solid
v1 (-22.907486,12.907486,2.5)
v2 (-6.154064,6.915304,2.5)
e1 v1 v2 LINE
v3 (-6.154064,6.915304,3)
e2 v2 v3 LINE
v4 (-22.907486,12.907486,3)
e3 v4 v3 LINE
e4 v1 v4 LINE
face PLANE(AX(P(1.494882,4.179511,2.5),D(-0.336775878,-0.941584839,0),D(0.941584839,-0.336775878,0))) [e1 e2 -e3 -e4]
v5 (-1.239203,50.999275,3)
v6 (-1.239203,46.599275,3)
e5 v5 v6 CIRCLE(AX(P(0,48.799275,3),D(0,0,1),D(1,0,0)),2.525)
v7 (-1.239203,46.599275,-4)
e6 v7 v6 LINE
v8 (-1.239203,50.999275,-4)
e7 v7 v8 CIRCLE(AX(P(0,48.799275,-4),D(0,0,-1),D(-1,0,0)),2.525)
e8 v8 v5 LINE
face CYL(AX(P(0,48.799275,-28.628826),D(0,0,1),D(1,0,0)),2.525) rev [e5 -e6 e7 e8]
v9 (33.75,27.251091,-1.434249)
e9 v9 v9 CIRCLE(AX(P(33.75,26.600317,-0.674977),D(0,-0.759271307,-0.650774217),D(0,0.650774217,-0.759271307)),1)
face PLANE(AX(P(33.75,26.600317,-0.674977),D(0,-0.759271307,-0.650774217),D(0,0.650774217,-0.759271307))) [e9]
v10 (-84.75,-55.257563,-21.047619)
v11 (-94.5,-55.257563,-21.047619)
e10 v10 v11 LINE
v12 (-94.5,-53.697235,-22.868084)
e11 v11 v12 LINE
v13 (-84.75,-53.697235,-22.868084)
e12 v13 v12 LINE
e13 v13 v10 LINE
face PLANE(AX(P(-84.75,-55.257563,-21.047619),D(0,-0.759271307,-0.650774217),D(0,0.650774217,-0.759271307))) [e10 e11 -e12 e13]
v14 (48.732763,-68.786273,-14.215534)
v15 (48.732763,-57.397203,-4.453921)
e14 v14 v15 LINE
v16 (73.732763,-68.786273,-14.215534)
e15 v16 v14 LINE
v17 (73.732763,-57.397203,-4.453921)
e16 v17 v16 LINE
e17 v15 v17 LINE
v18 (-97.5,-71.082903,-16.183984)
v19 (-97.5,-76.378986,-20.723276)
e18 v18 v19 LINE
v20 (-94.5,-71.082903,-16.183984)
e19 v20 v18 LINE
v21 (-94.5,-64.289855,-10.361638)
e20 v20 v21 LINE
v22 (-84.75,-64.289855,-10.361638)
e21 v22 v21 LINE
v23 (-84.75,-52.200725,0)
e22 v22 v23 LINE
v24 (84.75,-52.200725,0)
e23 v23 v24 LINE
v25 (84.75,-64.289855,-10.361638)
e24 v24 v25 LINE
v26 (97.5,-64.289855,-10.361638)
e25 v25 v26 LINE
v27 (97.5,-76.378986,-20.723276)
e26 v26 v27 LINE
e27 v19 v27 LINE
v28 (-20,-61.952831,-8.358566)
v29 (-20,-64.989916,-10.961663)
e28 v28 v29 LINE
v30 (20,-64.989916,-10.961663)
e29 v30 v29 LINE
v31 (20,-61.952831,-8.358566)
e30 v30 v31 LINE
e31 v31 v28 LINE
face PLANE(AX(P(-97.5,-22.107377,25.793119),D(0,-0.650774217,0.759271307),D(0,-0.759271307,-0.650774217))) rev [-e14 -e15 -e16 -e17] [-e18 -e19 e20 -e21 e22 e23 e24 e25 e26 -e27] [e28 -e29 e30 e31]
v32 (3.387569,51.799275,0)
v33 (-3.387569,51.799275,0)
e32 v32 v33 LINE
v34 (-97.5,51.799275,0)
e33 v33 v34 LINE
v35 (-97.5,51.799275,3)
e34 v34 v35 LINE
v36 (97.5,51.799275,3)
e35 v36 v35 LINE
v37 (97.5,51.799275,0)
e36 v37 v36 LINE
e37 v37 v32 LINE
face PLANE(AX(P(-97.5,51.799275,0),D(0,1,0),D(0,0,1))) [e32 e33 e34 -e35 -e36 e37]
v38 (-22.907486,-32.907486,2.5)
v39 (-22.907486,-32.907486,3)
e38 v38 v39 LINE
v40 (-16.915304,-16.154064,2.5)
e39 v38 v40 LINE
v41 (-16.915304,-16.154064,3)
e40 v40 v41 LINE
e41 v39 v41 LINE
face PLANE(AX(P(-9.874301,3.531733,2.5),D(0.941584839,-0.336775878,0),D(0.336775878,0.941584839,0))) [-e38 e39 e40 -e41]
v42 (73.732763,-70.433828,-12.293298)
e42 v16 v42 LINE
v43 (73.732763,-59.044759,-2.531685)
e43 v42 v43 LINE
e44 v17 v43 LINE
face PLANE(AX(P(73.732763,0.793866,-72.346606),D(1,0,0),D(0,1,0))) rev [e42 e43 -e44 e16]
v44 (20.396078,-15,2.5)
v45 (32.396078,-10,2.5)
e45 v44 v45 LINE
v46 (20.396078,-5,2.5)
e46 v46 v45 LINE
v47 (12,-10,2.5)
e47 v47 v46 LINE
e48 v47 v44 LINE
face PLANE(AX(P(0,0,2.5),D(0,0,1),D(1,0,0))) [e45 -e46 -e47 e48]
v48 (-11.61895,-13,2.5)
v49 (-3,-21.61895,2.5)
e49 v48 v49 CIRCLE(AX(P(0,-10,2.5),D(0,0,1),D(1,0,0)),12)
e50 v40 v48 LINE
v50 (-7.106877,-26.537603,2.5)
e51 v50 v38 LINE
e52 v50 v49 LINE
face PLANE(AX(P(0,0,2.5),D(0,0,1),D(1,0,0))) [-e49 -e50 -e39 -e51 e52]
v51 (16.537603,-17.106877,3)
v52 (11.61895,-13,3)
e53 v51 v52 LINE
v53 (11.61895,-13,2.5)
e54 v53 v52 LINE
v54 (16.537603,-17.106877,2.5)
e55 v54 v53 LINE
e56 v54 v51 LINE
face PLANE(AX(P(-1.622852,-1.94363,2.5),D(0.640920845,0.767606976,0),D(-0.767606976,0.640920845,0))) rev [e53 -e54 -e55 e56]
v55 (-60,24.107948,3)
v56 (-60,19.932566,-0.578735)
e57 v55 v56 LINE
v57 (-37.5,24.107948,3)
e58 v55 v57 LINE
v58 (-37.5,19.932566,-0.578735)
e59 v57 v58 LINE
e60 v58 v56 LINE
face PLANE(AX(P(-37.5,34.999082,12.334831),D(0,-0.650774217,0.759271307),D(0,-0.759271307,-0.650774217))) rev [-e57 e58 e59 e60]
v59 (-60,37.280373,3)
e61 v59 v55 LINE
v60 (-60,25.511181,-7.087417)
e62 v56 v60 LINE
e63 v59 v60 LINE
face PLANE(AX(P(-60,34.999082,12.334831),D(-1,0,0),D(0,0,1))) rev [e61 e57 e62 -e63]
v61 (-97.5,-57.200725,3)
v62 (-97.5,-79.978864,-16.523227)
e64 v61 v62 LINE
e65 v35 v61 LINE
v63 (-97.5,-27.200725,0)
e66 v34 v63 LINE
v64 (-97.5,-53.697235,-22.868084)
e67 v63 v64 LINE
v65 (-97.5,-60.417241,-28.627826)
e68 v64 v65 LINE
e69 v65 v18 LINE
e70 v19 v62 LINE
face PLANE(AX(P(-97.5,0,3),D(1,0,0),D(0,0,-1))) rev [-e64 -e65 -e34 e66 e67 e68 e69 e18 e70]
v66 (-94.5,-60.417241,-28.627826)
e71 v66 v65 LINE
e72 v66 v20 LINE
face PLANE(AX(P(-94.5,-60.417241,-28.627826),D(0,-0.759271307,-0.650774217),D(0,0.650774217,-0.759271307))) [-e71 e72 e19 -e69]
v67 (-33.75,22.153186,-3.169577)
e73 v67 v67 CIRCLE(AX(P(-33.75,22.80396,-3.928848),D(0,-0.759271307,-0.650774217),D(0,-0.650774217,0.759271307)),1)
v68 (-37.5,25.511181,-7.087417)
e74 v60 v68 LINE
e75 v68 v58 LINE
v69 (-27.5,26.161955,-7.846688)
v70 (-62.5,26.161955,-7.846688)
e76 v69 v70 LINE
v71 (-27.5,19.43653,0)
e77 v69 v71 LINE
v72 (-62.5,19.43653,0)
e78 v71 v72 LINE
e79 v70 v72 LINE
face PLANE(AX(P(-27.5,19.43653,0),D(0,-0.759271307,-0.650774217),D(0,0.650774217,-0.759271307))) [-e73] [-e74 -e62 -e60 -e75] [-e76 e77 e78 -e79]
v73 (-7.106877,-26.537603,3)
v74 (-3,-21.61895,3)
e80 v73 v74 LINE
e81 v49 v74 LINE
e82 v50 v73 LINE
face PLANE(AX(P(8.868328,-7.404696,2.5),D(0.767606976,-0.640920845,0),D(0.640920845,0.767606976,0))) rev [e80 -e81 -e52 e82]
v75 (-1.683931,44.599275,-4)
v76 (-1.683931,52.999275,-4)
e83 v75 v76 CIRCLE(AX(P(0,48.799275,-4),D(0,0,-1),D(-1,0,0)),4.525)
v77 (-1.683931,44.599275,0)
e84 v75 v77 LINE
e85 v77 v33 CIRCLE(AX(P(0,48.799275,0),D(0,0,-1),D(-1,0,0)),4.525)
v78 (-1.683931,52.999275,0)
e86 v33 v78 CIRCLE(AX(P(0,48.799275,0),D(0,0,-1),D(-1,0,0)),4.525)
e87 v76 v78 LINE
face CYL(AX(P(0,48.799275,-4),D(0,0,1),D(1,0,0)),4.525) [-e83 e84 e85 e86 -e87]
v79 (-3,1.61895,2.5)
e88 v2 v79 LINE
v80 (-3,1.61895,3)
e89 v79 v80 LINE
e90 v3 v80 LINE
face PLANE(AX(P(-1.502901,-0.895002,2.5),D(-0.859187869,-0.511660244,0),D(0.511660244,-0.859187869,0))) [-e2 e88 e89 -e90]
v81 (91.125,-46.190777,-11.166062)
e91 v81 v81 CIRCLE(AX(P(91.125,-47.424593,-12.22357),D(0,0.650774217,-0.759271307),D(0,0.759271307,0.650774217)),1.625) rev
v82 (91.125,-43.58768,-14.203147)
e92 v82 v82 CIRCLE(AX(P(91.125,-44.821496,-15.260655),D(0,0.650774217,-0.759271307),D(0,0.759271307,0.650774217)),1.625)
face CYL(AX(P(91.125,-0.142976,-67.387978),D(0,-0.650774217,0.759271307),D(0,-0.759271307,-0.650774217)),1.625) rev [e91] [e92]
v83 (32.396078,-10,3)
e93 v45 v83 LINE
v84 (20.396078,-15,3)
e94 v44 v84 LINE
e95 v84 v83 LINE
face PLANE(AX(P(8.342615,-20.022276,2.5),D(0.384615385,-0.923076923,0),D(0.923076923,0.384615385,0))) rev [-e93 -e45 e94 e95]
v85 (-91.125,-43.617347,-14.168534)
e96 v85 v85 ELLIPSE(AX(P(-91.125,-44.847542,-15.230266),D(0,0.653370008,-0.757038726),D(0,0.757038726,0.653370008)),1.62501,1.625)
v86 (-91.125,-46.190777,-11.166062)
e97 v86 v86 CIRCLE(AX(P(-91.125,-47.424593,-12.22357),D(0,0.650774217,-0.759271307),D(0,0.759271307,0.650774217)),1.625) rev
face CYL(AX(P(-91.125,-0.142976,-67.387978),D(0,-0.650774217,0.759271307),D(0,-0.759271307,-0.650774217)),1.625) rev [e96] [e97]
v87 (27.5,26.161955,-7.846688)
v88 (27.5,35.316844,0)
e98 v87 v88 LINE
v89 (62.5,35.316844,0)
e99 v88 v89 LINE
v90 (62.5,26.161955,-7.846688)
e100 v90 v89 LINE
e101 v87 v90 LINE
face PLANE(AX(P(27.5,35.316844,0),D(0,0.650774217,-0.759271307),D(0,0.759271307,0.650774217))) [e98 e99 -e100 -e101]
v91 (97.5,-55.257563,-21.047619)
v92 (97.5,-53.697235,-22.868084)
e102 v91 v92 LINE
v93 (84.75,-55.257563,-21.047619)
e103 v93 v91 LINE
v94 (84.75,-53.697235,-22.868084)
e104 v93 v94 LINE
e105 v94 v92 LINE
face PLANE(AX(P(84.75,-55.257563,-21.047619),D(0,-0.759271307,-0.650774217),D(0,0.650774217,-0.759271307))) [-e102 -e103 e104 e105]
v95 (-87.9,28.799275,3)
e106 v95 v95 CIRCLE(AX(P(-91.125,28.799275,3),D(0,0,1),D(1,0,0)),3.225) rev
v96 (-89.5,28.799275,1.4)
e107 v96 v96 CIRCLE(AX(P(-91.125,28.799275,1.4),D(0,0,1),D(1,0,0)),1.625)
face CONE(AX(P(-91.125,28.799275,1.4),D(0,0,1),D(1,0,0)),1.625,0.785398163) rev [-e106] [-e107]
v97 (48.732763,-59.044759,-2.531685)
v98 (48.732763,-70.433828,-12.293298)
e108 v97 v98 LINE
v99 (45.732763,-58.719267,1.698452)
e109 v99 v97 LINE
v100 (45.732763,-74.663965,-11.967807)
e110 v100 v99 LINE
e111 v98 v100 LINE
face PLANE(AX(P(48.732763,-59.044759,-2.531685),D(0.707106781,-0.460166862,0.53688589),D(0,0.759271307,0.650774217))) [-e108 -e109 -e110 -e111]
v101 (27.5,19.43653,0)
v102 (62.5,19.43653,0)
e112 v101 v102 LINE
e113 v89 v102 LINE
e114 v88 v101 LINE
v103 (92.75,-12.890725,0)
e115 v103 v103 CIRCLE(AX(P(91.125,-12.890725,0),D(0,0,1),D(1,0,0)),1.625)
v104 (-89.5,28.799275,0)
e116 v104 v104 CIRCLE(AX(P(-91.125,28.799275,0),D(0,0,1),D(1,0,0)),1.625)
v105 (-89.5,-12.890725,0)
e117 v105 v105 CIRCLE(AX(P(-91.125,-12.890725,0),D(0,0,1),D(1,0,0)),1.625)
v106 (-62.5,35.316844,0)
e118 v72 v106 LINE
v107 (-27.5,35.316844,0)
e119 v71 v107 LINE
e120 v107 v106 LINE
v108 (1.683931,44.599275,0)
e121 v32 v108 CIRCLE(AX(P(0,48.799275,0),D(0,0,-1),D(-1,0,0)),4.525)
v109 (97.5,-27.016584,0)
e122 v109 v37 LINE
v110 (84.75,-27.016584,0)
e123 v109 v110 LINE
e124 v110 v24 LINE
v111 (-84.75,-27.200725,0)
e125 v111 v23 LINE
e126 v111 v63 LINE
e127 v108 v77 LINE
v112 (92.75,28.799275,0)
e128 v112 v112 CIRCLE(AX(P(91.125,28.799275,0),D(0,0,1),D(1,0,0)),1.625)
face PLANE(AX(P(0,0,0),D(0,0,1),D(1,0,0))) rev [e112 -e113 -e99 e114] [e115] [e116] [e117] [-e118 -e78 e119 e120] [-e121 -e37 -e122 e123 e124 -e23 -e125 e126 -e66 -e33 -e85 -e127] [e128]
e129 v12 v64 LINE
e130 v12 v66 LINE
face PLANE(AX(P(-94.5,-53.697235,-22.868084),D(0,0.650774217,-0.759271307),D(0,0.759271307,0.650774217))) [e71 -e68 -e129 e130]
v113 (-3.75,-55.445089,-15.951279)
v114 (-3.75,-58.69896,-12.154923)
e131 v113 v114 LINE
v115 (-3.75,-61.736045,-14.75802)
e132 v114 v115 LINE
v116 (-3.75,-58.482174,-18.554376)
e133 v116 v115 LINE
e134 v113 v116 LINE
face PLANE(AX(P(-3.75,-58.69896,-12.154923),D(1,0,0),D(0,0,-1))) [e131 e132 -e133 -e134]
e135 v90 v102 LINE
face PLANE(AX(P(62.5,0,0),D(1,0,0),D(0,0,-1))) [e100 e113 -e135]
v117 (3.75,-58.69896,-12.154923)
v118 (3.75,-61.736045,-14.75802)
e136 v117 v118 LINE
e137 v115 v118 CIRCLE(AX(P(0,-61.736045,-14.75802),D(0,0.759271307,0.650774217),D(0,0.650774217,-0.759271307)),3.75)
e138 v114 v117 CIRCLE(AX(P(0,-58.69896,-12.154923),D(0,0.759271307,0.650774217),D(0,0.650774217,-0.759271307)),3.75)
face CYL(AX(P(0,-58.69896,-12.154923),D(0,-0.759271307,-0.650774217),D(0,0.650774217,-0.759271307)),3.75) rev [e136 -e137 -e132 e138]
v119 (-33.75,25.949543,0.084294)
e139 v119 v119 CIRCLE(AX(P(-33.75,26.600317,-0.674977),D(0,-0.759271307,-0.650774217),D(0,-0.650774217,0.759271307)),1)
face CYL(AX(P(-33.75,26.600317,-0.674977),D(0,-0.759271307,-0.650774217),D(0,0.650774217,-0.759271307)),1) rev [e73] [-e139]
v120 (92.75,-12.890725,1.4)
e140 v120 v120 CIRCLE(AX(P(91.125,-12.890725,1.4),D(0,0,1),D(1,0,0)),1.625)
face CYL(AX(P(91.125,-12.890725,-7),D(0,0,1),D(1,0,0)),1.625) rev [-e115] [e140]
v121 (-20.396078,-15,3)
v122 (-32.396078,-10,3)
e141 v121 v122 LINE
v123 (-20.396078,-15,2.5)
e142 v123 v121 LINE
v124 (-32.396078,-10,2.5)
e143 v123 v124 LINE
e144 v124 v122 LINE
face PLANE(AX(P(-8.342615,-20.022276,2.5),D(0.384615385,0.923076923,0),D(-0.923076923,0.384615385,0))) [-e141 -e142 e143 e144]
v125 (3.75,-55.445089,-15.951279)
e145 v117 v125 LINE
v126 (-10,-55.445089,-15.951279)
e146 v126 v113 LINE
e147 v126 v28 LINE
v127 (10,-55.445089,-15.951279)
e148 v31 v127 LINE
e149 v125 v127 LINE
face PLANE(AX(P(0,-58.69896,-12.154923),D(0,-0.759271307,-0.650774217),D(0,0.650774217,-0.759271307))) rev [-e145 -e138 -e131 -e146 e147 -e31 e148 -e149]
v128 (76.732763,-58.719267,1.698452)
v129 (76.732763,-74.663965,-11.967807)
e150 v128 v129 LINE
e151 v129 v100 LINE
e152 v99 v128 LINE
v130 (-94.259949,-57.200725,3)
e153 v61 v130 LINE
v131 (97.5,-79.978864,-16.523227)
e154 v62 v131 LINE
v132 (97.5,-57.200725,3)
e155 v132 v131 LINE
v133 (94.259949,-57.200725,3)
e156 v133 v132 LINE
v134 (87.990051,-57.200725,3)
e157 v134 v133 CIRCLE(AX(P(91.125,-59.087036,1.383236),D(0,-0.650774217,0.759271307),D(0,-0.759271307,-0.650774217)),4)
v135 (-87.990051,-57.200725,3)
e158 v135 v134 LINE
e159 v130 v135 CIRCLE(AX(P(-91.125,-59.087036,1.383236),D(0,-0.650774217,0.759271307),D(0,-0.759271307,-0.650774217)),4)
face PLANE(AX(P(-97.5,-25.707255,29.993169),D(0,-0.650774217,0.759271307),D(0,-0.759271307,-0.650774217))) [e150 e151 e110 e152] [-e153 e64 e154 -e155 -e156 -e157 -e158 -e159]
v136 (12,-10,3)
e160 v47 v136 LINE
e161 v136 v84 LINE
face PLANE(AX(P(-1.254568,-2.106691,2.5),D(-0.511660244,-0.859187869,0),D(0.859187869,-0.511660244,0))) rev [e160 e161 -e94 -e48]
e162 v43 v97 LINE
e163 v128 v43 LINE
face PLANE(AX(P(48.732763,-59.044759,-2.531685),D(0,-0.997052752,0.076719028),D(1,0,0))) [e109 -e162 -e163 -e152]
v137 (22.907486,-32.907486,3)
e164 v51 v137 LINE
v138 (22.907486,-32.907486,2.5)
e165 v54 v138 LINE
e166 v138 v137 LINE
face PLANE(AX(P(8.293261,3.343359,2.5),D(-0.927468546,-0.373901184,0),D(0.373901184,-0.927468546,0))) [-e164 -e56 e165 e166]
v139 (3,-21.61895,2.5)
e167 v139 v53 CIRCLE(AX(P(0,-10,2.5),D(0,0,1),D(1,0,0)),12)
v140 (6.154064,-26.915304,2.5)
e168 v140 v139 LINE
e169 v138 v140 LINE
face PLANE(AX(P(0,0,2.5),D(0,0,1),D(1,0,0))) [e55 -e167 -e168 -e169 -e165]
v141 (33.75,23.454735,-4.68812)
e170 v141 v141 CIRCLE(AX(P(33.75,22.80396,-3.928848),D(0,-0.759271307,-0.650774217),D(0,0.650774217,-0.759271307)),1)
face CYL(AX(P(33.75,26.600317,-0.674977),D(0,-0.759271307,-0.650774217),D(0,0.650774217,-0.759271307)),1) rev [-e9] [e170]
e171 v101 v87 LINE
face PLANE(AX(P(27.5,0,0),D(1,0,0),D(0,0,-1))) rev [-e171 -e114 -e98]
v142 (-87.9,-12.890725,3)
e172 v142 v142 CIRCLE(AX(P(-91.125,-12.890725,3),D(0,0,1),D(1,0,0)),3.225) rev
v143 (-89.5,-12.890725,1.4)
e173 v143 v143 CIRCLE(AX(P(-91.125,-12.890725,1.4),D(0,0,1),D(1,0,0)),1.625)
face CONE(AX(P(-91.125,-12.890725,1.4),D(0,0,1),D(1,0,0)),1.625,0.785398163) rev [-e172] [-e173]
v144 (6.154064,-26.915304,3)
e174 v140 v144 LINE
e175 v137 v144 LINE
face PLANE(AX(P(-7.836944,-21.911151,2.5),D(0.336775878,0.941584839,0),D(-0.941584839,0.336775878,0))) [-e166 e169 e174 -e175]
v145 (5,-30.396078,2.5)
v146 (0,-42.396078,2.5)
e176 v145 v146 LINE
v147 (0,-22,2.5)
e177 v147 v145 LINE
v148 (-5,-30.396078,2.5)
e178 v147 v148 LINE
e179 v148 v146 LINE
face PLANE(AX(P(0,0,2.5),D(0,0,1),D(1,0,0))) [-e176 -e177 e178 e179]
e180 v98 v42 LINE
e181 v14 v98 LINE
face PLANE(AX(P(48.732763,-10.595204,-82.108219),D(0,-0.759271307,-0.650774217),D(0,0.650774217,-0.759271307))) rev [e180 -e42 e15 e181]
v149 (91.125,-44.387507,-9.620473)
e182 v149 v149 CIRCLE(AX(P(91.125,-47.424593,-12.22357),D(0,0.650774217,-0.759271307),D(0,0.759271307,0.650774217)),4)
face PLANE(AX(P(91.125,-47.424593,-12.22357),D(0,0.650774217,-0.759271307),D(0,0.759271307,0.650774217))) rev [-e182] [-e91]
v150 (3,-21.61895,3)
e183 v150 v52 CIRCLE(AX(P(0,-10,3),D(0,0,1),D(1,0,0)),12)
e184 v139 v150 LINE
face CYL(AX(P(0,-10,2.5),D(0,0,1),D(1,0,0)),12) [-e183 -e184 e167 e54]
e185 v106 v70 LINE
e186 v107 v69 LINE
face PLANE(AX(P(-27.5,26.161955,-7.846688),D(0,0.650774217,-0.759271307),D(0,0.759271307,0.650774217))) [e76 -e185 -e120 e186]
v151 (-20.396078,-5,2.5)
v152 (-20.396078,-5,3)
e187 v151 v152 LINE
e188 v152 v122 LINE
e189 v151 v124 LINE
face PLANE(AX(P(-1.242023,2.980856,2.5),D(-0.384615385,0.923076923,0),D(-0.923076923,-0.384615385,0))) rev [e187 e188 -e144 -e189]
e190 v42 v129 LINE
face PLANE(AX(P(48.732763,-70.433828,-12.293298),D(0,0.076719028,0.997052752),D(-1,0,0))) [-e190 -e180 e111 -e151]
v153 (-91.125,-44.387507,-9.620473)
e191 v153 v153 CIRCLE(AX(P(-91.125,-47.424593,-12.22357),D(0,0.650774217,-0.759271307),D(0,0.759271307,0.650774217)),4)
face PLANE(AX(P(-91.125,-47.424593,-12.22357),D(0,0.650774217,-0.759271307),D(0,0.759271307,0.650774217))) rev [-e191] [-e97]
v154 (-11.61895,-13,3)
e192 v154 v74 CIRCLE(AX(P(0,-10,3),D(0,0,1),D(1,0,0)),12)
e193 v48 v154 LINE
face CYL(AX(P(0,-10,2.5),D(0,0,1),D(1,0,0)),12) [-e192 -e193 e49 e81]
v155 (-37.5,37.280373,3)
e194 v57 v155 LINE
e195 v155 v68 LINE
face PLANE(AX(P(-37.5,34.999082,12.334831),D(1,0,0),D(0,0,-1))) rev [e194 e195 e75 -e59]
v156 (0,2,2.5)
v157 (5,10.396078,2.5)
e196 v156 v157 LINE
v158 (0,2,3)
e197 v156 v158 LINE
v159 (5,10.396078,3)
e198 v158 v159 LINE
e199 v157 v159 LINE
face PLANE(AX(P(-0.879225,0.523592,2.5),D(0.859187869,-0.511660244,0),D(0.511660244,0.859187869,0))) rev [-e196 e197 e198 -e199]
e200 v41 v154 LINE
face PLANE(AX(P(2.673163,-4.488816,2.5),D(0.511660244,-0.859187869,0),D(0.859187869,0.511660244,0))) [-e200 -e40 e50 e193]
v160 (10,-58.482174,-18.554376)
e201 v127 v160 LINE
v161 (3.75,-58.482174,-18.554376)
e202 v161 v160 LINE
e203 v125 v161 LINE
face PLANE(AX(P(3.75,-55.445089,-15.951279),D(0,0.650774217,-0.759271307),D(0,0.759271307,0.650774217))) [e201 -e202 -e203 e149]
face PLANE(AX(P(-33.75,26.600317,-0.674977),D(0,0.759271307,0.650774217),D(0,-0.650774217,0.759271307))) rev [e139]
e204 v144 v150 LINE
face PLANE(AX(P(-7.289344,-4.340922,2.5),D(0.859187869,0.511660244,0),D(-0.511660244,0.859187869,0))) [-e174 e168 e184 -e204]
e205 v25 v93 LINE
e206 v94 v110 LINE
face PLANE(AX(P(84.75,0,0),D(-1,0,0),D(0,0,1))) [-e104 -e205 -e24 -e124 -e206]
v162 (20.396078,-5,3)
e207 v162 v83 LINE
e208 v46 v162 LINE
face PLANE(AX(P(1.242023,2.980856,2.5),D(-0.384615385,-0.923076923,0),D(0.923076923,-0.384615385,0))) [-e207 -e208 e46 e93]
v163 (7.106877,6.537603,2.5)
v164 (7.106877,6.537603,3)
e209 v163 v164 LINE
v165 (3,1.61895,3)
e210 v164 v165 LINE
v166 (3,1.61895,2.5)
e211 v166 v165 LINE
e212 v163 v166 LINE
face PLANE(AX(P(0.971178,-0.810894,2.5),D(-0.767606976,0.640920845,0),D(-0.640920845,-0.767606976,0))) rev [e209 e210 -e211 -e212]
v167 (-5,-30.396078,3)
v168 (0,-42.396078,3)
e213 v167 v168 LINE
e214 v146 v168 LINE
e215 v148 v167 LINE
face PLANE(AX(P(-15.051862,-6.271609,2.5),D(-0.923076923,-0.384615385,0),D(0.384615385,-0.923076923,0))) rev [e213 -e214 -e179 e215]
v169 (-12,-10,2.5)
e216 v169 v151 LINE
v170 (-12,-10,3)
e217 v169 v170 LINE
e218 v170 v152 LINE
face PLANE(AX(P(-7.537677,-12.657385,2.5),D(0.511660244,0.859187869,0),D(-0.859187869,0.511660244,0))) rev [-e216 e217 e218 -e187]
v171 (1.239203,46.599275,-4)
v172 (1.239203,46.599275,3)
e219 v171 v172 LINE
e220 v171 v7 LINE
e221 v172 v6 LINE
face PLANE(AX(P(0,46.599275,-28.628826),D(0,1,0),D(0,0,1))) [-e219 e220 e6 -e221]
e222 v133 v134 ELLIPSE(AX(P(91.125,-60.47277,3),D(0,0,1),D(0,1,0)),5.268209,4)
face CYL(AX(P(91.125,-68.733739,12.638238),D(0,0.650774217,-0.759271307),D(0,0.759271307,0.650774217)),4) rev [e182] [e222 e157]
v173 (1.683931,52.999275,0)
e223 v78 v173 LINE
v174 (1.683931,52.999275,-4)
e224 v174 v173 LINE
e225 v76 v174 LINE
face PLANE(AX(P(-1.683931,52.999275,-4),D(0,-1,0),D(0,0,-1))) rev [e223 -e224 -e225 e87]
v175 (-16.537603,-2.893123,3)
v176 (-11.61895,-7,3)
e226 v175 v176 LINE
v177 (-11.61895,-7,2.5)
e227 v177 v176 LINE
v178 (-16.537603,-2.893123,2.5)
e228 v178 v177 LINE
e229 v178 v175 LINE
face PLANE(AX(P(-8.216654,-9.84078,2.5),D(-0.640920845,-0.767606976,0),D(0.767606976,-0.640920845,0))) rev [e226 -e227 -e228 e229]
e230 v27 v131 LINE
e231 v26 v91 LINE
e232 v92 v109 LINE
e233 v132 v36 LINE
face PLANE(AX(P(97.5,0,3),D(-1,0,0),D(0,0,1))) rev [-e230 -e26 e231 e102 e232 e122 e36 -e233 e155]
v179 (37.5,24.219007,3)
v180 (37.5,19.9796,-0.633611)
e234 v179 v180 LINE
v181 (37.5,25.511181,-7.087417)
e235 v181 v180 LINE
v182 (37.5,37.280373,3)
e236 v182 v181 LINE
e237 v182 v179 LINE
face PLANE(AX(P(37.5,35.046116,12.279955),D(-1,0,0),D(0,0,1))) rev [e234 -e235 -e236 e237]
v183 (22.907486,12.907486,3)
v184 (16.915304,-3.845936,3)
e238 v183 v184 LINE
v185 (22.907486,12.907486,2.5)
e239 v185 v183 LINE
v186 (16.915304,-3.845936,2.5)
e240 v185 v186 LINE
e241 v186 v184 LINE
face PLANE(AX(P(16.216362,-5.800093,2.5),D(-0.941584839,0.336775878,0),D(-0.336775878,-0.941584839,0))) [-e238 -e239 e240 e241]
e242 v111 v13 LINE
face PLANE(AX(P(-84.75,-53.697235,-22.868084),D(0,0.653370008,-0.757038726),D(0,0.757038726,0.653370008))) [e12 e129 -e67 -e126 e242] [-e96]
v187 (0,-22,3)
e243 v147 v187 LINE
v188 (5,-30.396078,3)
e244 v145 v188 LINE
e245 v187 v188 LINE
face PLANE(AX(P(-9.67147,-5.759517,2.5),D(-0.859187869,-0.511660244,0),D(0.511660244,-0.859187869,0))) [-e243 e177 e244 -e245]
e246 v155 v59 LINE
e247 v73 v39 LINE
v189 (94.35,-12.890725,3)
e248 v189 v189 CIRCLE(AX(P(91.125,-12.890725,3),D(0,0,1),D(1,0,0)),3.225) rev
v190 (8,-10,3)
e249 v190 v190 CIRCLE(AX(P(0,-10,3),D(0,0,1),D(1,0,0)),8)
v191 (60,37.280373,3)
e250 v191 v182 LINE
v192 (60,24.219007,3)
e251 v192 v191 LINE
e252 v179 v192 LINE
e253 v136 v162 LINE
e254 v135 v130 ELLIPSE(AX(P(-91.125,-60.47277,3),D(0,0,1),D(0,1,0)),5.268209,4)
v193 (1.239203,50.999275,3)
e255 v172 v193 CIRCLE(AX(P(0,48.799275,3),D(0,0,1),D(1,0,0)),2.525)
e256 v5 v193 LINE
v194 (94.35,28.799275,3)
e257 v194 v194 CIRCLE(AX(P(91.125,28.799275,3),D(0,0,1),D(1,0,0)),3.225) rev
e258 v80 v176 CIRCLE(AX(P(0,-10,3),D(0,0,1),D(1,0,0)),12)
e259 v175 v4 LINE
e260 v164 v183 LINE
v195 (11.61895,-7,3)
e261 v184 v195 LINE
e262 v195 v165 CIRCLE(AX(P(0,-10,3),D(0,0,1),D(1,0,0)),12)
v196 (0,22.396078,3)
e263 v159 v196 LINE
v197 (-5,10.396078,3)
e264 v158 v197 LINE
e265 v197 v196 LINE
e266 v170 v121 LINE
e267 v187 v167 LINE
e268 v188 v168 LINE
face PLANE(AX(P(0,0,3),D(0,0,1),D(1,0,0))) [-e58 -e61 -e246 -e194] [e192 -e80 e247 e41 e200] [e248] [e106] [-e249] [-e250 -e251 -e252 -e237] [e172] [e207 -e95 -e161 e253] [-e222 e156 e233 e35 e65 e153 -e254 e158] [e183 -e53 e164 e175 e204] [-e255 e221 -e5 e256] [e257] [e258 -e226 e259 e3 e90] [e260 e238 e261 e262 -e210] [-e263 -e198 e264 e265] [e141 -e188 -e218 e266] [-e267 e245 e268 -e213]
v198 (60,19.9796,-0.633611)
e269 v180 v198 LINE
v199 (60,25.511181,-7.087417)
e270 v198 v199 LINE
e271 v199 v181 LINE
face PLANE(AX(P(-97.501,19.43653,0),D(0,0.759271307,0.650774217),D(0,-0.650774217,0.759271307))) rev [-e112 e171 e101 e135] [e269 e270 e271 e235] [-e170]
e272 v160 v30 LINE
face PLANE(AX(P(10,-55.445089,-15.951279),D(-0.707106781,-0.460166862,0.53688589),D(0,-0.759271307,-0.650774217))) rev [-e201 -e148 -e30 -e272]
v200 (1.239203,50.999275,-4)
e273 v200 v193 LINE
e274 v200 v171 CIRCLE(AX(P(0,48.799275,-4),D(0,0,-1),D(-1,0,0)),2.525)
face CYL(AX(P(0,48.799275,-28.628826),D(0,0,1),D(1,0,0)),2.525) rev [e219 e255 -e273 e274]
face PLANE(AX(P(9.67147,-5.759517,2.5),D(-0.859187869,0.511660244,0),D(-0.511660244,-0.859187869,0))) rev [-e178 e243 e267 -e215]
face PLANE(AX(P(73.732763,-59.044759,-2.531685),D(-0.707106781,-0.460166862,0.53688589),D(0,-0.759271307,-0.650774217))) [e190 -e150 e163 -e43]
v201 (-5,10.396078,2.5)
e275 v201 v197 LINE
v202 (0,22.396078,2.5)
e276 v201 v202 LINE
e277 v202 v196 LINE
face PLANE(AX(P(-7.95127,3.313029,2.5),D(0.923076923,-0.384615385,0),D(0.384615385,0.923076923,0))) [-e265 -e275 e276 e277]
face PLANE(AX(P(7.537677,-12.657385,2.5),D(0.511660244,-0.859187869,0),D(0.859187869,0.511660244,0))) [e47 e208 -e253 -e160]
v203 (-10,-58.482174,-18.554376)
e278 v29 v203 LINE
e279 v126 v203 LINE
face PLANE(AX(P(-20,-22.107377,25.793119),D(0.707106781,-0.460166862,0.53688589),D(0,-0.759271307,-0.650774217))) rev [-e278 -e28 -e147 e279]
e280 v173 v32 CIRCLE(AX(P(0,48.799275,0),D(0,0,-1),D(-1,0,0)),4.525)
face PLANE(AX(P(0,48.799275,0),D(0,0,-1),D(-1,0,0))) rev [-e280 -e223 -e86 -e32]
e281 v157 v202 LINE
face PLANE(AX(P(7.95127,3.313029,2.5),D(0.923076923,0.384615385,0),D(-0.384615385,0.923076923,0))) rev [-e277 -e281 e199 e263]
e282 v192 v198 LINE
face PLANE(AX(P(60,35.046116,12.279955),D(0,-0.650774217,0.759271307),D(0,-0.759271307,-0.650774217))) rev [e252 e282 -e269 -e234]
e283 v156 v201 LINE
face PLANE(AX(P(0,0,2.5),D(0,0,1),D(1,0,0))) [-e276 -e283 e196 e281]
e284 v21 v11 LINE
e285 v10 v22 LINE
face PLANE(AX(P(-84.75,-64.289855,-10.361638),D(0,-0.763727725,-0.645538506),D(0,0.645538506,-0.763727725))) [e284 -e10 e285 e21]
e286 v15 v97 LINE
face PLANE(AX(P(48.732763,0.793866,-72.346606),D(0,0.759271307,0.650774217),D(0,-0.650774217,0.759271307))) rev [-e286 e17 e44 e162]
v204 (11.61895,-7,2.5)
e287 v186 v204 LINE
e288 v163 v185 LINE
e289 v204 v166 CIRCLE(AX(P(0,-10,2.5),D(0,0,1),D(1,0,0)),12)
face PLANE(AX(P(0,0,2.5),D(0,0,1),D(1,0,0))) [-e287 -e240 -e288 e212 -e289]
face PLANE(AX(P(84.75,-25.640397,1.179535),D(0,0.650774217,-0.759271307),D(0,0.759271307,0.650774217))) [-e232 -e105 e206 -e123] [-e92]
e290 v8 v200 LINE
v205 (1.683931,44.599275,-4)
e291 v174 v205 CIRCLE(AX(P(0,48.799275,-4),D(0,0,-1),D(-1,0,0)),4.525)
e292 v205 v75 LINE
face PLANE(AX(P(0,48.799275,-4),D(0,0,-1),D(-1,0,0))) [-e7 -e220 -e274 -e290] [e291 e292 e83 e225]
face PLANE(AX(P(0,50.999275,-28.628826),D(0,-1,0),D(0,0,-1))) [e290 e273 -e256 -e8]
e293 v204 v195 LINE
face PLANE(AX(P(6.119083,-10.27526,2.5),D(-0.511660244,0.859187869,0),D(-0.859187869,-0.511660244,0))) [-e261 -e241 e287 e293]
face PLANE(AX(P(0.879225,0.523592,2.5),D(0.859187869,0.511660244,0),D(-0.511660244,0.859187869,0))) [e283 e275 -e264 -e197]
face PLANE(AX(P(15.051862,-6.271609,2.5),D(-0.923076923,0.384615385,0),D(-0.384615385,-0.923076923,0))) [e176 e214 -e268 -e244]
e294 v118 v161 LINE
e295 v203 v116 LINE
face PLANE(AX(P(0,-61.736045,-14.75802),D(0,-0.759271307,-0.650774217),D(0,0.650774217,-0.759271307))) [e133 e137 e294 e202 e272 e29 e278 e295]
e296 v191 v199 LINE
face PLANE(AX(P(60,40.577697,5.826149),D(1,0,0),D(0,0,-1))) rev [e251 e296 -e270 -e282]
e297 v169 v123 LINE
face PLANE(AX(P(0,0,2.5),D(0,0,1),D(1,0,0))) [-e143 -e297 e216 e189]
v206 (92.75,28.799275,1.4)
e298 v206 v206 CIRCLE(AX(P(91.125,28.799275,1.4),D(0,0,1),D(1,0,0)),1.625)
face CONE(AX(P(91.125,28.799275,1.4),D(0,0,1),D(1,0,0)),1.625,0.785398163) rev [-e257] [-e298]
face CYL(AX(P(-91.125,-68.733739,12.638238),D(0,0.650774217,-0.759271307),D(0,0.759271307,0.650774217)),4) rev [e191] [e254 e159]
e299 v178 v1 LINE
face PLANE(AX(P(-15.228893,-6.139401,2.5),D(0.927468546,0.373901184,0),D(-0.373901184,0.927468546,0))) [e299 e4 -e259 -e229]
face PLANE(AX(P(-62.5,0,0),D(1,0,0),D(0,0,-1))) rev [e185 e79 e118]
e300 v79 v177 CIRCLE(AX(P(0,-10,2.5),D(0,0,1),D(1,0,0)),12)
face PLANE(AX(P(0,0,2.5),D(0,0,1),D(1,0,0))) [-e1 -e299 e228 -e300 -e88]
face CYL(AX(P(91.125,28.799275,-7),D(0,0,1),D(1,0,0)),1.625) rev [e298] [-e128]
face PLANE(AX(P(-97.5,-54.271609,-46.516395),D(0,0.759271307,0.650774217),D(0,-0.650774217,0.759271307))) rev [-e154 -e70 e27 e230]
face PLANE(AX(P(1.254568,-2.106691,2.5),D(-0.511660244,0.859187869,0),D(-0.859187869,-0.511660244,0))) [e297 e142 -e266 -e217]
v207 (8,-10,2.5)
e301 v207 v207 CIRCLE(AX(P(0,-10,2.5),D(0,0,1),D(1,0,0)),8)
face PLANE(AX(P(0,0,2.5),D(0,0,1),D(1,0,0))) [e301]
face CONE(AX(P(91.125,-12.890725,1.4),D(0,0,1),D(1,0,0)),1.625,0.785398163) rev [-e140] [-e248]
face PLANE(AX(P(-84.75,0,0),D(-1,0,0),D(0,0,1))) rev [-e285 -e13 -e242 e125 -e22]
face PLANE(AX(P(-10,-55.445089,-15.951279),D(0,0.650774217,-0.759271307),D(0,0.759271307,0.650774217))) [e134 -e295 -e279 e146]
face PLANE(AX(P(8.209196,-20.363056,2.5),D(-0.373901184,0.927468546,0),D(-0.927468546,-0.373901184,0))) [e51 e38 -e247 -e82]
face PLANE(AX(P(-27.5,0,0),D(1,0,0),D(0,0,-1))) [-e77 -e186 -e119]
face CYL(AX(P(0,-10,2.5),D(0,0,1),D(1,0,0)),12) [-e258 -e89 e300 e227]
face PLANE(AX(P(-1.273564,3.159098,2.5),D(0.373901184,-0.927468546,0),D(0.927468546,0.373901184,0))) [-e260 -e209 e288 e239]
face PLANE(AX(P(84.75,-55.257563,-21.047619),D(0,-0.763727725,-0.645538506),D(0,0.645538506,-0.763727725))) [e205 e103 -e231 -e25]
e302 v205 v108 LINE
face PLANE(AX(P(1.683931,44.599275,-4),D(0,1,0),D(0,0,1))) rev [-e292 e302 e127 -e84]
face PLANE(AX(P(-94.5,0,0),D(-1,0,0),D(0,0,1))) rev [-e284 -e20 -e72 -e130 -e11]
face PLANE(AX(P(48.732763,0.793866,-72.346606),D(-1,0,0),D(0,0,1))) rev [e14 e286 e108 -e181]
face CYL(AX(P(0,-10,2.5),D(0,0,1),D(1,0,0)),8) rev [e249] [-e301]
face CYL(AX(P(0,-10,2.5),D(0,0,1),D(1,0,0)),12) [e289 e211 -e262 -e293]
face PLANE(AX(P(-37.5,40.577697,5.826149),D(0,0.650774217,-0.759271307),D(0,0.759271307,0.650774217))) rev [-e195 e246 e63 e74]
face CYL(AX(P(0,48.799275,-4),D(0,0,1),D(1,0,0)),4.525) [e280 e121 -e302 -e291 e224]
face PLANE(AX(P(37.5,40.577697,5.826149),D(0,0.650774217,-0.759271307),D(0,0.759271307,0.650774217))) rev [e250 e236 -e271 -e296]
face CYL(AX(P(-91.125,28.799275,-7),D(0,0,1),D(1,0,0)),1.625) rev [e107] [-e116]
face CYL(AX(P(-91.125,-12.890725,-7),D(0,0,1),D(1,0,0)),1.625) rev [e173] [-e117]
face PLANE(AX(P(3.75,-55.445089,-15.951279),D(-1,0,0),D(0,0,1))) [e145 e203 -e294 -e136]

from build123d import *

# Parameters (mm, degrees)
CROQUIS1_W                  = 195
CROQUIS1_H                  = 38
CROQUIS1_R                  = 1.625
SALIENTE_EXTRUIR1_DEPTH     = 3
CROQUIS8_W                  = 195
CROQUIS8_H                  = 3
SALIENTE_EXTRUIR5_DEPTH     = 5
CROQUIS9_W                  = 195
CROQUIS9_H                  = 3
SALIENTE_EXTRUIR6_DEPTH     = 5
SALIENTE_EXTRUIR7_START     = -35
SALIENTE_EXTRUIR7_DEPTH     = 35
CORTAR_EXTRUIR4_DEPTH       = 106.249773968
CORTAR_EXTRUIR4_DEPTH_BACK  = 106.249773968
CROQUIS11_W                 = 22.5
CROQUIS11_H                 = 8.5
CORTAR_EXTRUIR5_REACH       = 168.049
CROQUIS13_R                 = 1
CORTAR_EXTRUIR6_DEPTH       = 5
SALIENTE_EXTRUIR8_START     = -35
SALIENTE_EXTRUIR8_DEPTH     = 35
CORTAR_EXTRUIR7_DEPTH       = 105.027363957
CORTAR_EXTRUIR7_DEPTH_BACK  = 105.027363957
CROQUIS16_W                 = 22.5
CROQUIS16_H                 = 8.572274099
CROQUIS17_R                 = 1
CORTAR_EXTRUIR8_DEPTH       = 5
CROQUIS18_R                 = 1.625
CORTAR_EXTRUIR9_DEPTH       = 10
CROQUIS19_W                 = 195
CROQUIS19_H                 = 24
SALIENTE_EXTRUIR9_DEPTH     = 3
CROQUIS20_W                 = 195
CROQUIS20_H                 = 28.69
SALIENTE_EXTRUIR10_DEPTH    = 3
CROQUIS22_W                 = 195
CROQUIS22_H                 = 8.799275258
CROQUIS22_W_2               = 10.817472397
CROQUIS22_H_2               = 9.408992843
CROQUIS22_W_3               = 11.057059306
SALIENTE_EXTRUIR11_DEPTH    = 3
CROQUIS23_R                 = 1.625
CORTAR_EXTRUIR10_DEPTH      = 10
CORTAR_EXTRUIR11_DEPTH      = 202.915168907
CORTAR_EXTRUIR11_DEPTH_BACK = 202.915168907
CROQUIS25_W                 = 6.04831912
CROQUIS25_H                 = 14.575165693
SALIENTE_EXTRUIR15_DEPTH    = 12.75
SALIENTE_EXTRUIR16_DEPTH    = 12.75
CROQUIS27_W                 = 3
CROQUIS27_H                 = 30
SALIENTE_EXTRUIR13_DEPTH    = 195
SALIENTE_EXTRUIR14_DEPTH    = 195
CORTAR_EXTRUIR12_DEPTH      = 125.253856914
CORTAR_EXTRUIR12_DEPTH_BACK = 125.253856914
CROQUIS31_R                 = 1.625
SALIENTE_EXTRUIR17_DEPTH    = 12.75
SALIENTE_EXTRUIR18_DEPTH    = 12.75
CORTAR_EXTRUIR15_DEPTH      = 125.560379507
CORTAR_EXTRUIR15_DEPTH_BACK = 125.560379507
CROQUIS39_R                 = 1.625
CORTAR_EXTRUIR16_START      = -4
CROQUIS40_R                 = 4
CORTAR_EXTRUIR16_DEPTH      = 121.560379507
SALIENTE_EXTRUIR19_START    = -15
SALIENTE_EXTRUIR19_DEPTH    = 4
CHAFL_N1_SIZE               = 10
SALIENTE_EXTRUIR20_DEPTH    = 3
CORTAR_EXTRUIR17_REACH      = 139.659
CROQUIS47_W                 = 25
CROQUIS47_H                 = 15
CORTAR_EXTRUIR18_REACH      = 132.012
CROQUIS49_R                 = 8
CORTAR_EXTRUIR19_DEPTH      = 0.5
CHAFL_N2_SIZE               = 3
SALIENTE_EXTRUIR22_DEPTH    = 4
CHAFL_N3_SIZE               = 1.6


with BuildPart() as part:
    # Croquis1 → Saliente-Extruir1 (new body)
    with BuildSketch(Plane.XY):
        with Locations((0, 19)):
            Rectangle(CROQUIS1_W, CROQUIS1_H)
        with Locations((91.125, 15)):
            Circle(CROQUIS1_R, mode=Mode.SUBTRACT)
        with Locations(Location((-91.125, 15, 0), (0, 0, 180))):
            Circle(CROQUIS1_R, mode=Mode.SUBTRACT)
    extrude(amount=SALIENTE_EXTRUIR1_DEPTH)

    # Croquis8 → Saliente-Extruir5 (add)
    with BuildSketch(Plane.XZ):
        with Locations((0, 1.5)):
            Rectangle(CROQUIS8_W, CROQUIS8_H)
    extrude(amount=SALIENTE_EXTRUIR5_DEPTH)

    # Croquis9 → Saliente-Extruir6 (add)
    with BuildSketch(Plane(origin=(0, 38, 0), x_dir=(1, 0, 0), z_dir=(0, 1, 0))):
        with Locations((0, -1.5)):
            Rectangle(CROQUIS9_W, CROQUIS9_H)
    extrude(amount=SALIENTE_EXTRUIR6_DEPTH)

    # Croquis10 → Saliente-Extruir7 (add)
    with BuildSketch(Plane(origin=(97.5, 0, 0), x_dir=(0, 0, -1), z_dir=(1, 0, 0)).offset(SALIENTE_EXTRUIR7_START)):
        Polygon((0, 35.316843742), (11.100559408, 22.365598856), (1.230032412, 13.905534031), (0, 12.851268747), align=None)
    extrude(amount=-SALIENTE_EXTRUIR7_DEPTH)

    # Croquis11 → Cortar-Extruir4 (cut, two sides: drawn at the far end of the back side and taken through both)
    with BuildSketch(Plane(origin=(0, 7.408665422, 6.349994257), x_dir=(1, 0, 0), z_dir=(0, -0.7592713073348797, -0.6507742172658522)).offset(-CORTAR_EXTRUIR4_DEPTH_BACK)):
        with Locations((48.75, -17.733291342)):
            Rectangle(CROQUIS11_W, CROQUIS11_H)
    extrude(amount=CORTAR_EXTRUIR4_DEPTH + CORTAR_EXTRUIR4_DEPTH_BACK, mode=Mode.SUBTRACT)

    # Croquis12 → Cortar-Extruir5 (cut, up to next)
    with BuildSketch(Plane(origin=(62.5, 0, 0), x_dir=(0, 0, -1), z_dir=(1, 0, 0)), mode=Mode.PRIVATE) as cortar_extruir5_sk1:
        Polygon((11.100559408, 22.365598856), (0, 12.851268747), (0, 19.436530105), (7.846688321, 26.161955392), align=None)
    cortar_extruir5_tool1 = extrude(cortar_extruir5_sk1.sketch, amount=-CORTAR_EXTRUIR5_REACH, mode=Mode.PRIVATE) & part.part
    add(cortar_extruir5_tool1.solids().sort_by_distance((62.5, 20.055266, -4.783378))[0], mode=Mode.SUBTRACT)

    # Croquis13 → Cortar-Extruir6 (cut)
    with BuildSketch(Plane(origin=(0, 11.205021959, 9.603865343), x_dir=(1, 0, 0), z_dir=(0, -0.7592713073348788, -0.6507742172658535))):
        with Locations(Location((33.75, -17.823291342, 0), (0, 0, 270))):
            Circle(CROQUIS13_R)
    extrude(amount=-CORTAR_EXTRUIR6_DEPTH, mode=Mode.SUBTRACT)

    # Croquis14 → Saliente-Extruir8 (add)
    with BuildSketch(Plane.ZY.offset(97.5).offset(SALIENTE_EXTRUIR8_START)):
        Polygon((0, 19.436530105), (-7.846688321, 26.161955392), (0, 35.316843742), align=None)
    extrude(amount=-SALIENTE_EXTRUIR8_DEPTH)

    # Croquis16 → Cortar-Extruir7 (cut, two sides: drawn at the far end of the back side and taken through both)
    with BuildSketch(Plane(origin=(0, 11.205021959, 9.603865343), x_dir=(1, 0, 0), z_dir=(0, -0.7592713073348788, -0.6507742172658535)).offset(-CORTAR_EXTRUIR7_DEPTH_BACK)):
        with Locations((-48.75, -17.697154293)):
            Rectangle(CROQUIS16_W, CROQUIS16_H)
    extrude(amount=CORTAR_EXTRUIR7_DEPTH + CORTAR_EXTRUIR7_DEPTH_BACK, mode=Mode.SUBTRACT)

    # Croquis17 → Cortar-Extruir8 (cut)
    with BuildSketch(Plane(origin=(0, 11.205021959, 9.603865343), x_dir=(1, 0, 0), z_dir=(0, -0.7592713073348788, -0.6507742172658535))):
        with Locations(Location((-33.75, -17.823291342, 0), (0, 0, 90))):
            Circle(CROQUIS17_R)
    extrude(amount=-CORTAR_EXTRUIR8_DEPTH, mode=Mode.SUBTRACT)

    # Croquis18 → Cortar-Extruir9 (cut)
    with BuildSketch(Plane.XY.offset(3)):
        with Locations((91.125, 23)):
            Circle(CROQUIS18_R)
        with Locations((-91.125, 23)):
            Circle(CROQUIS18_R)
    extrude(amount=-CORTAR_EXTRUIR9_DEPTH, mode=Mode.SUBTRACT)

    # Croquis19 → Saliente-Extruir9 (add)
    with BuildSketch(Plane.XY.offset(3)):
        with Locations((0, 7)):
            Rectangle(CROQUIS19_W, CROQUIS19_H)
    extrude(amount=-SALIENTE_EXTRUIR9_DEPTH)

    # Croquis20 → Saliente-Extruir10 (add)
    with BuildSketch(Plane.XY.offset(3)):
        with Locations((0, -19.345)):
            Rectangle(CROQUIS20_W, CROQUIS20_H)
    extrude(amount=-SALIENTE_EXTRUIR10_DEPTH)

    # Croquis22 → Saliente-Extruir11 (add)
    with BuildSketch(Plane.XY.offset(3)):
        with Locations((0, 47.399637629)):
            Rectangle(CROQUIS22_W, CROQUIS22_H)
        with Locations((-92.091263802, 22.840486177)):
            Rectangle(CROQUIS22_W_2, CROQUIS22_H_2)
        with Locations((91.971470347, 22.840486177)):
            Rectangle(CROQUIS22_W_3, CROQUIS22_H_2)
    extrude(amount=-SALIENTE_EXTRUIR11_DEPTH)

    # Croquis23 → Cortar-Extruir10 (cut)
    with BuildSketch(Plane.XY.offset(3)):
        with Locations((-91.125, 28.799275258)):
            Circle(CROQUIS23_R)
        with Locations((-91.125, -12.890724742)):
            Circle(CROQUIS23_R)
        with Locations((91.125, -12.890724742)):
            Circle(CROQUIS23_R)
        with Locations((91.125, 28.799275258)):
            Circle(CROQUIS23_R)
    extrude(amount=-CORTAR_EXTRUIR10_DEPTH, mode=Mode.SUBTRACT)

    # Croquis25 → Cortar-Extruir11 (cut, two sides: drawn at the far end of the back side and taken through both)
    with BuildSketch(Plane.ZY.offset(97.5).offset(-CORTAR_EXTRUIR11_DEPTH_BACK)):
        with Locations((3.02415956, -34.488307588)):
            Rectangle(CROQUIS25_W, CROQUIS25_H)
    extrude(amount=CORTAR_EXTRUIR11_DEPTH + CORTAR_EXTRUIR11_DEPTH_BACK, mode=Mode.SUBTRACT)

    # Croquis29 → Saliente-Extruir15 (add)
    with BuildSketch(Plane(origin=(97.5, 0, 0), x_dir=(0, 0, -1), z_dir=(1, 0, 0))):
        Polygon((-3, -27.200724742), (21.04761885, -55.257563071), (22.868084319, -53.697235453), (-1.179534531, -25.640397124), align=None)
    extrude(amount=-SALIENTE_EXTRUIR15_DEPTH)

    # Croquis30 → Saliente-Extruir16 (add)
    with BuildSketch(Plane.ZY.offset(97.5)):
        Polygon((0, -27.200724742), (3, -27.200724742), (-21.04761885, -55.257563071), (-22.868084319, -53.697235453), align=None)
    extrude(amount=-SALIENTE_EXTRUIR16_DEPTH)

    # Croquis27 → Saliente-Extruir13 (add)
    with BuildSketch(Plane(origin=(97.5, 0, 0), x_dir=(0, 0, -1), z_dir=(1, 0, 0))):
        with Locations((-1.5, -42.200724742)):
            Rectangle(CROQUIS27_W, CROQUIS27_H)
    extrude(amount=-SALIENTE_EXTRUIR13_DEPTH)

    # Croquis28 → Saliente-Extruir14 (add)
    with BuildSketch(Plane(origin=(97.5, 0, 0), x_dir=(0, 0, -1), z_dir=(1, 0, 0))):
        Polygon((20.723276226, -76.378985981), (0, -52.200724742), (0, -57.200724742), (-3, -57.200724742), (16.523226518, -79.978863962), align=None)
        Polygon((0, -57.200724742), (0, -52.200724742), (-3, -54.772035726), (-3, -57.200724742), align=None)
    extrude(amount=-SALIENTE_EXTRUIR14_DEPTH)

    # Croquis31 → Cortar-Extruir12 (cut, two sides: drawn at the far end of the back side and taken through both)
    with BuildSketch(Plane(origin=(0, -13.002042132, 15.169742848), x_dir=(1, 0, 0), z_dir=(0, -0.6507742172658533, 0.7592713073348789)).offset(-CORTAR_EXTRUIR12_DEPTH_BACK)):
        with Locations(Location((91.125, -43.962916807, 0), (0, 0, 270))):
            Circle(CROQUIS31_R)
        with Locations(Location((-91.125, -43.962916807, 0), (0, 0, 270))):
            Circle(CROQUIS31_R)
    extrude(amount=CORTAR_EXTRUIR12_DEPTH + CORTAR_EXTRUIR12_DEPTH_BACK, mode=Mode.SUBTRACT)

    # Croquis32 → Saliente-Extruir17 (add)
    with BuildSketch(Plane(origin=(97.5, 0, 0), x_dir=(0, 0, -1), z_dir=(1, 0, 0))):
        Polygon((0, -30.7008848), (21.04761885, -55.257563071), (10.361638113, -64.289855362), (0, -52.200724742), align=None)
    extrude(amount=-SALIENTE_EXTRUIR17_DEPTH)

    # Croquis33 → Saliente-Extruir18 (add)
    with BuildSketch(Plane.ZY.offset(97.5)):
        Polygon((0, -30.7008848), (0, -52.200724742), (-10.361638113, -64.289855362), (-21.04761885, -55.257563071), align=None)
    extrude(amount=-SALIENTE_EXTRUIR18_DEPTH)

    # Croquis39 → Cortar-Extruir15 (cut, two sides: drawn at the far end of the back side and taken through both)
    with BuildSketch(Plane(origin=(0, -11.441714514, 13.349277379), x_dir=(-1, 0, 0), z_dir=(0, 0.6507742172658534, -0.7592713073348788)).offset(-CORTAR_EXTRUIR15_DEPTH_BACK)):
        with Locations(Location((91.125, -43.962916807, 0), (0, 0, 270))):
            Circle(CROQUIS39_R)
        with Locations(Location((-91.125, -43.962916807, 0), (0, 0, 270))):
            Circle(CROQUIS39_R)
    extrude(amount=CORTAR_EXTRUIR15_DEPTH + CORTAR_EXTRUIR15_DEPTH_BACK, mode=Mode.SUBTRACT)

    # Croquis40 → Cortar-Extruir16 (cut, through all)
    with BuildSketch(Plane(origin=(0, -11.441714514, 13.349277379), x_dir=(-1, 0, 0), z_dir=(0, 0.6507742172658534, -0.7592713073348788)).offset(CORTAR_EXTRUIR16_START)):
        with Locations(Location((-91.125, -43.962916807, 0), (0, 0, 90))):
            Circle(CROQUIS40_R)
        with Locations(Location((91.125, -43.962916807, 0), (0, 0, 90))):
            Circle(CROQUIS40_R)
    extrude(amount=-CORTAR_EXTRUIR16_DEPTH, mode=Mode.SUBTRACT)

    # Croquis43 → Saliente-Extruir19 (add)
    with BuildSketch(Plane(origin=(0, -54.271609374, -46.516395087), x_dir=(1, 0, 0), z_dir=(0, -0.7592713073348788, -0.6507742172658533)).offset(SALIENTE_EXTRUIR19_START)):
        with BuildLine():
            Line((-10, 33.970885785), (10, 33.970885785))
            Line((10, 33.970885785), (10, 23.970885785))
            Line((10, 23.970885785), (3.75, 23.970885785))
            Line((3.75, 23.970885785), (3.75, 28.970885785))
            ThreePointArc((3.75, 28.970885785), (0, 32.720885785), (-3.75, 28.970885785))
            Line((-3.75, 28.970885785), (-3.75, 23.970885785))
            Line((-3.75, 23.970885785), (-10, 23.970885785))
            Line((-10, 23.970885785), (-10, 33.970885785))
        make_face()
    extrude(amount=-SALIENTE_EXTRUIR19_DEPTH)

    # Chaflán1
    chafl_n1_edges = [part.edges().sort_by_distance(p)[0] for p in [
        (-10, -63.471373756, -9.660114532),
        (10, -63.471373756, -9.660114532),
    ]]
    chamfer(chafl_n1_edges, length=CHAFL_N1_SIZE - 0.0001)  # a hair under: the kernel refuses the full size

    # Croquis44 → Saliente-Extruir20 (add)
    with BuildSketch(Plane.ZY.offset(97.5)):
        Polygon((-28.627825889, -60.417241249), (-16.183984406, -71.082903342), (-10.361638113, -64.289855362), (-22.868084319, -53.697235453), align=None)
    extrude(amount=-SALIENTE_EXTRUIR20_DEPTH)

    # Croquis47 → Cortar-Extruir17 (cut, up to next)
    with BuildSketch(Plane(origin=(0, -25.707254588, 29.993168569), x_dir=(1, 0, 0), z_dir=(0, -0.6507742172658535, 0.7592713073348788)), mode=Mode.PRIVATE) as cortar_extruir17_sk1:
        with Locations((61.232763252, -53.978546404)):
            Rectangle(CROQUIS47_W, CROQUIS47_H)
    cortar_extruir17_tool1 = extrude(cortar_extruir17_sk1.sketch, amount=-CORTAR_EXTRUIR17_REACH, mode=Mode.PRIVATE) & part.part
    add(cortar_extruir17_tool1.solids().sort_by_distance((61.232763, -66.691616, -5.134678))[0], mode=Mode.SUBTRACT)

    # Croquis48 → Cortar-Extruir18 (cut, up to next)
    with BuildSketch(Plane.XY.offset(3), mode=Mode.PRIVATE) as cortar_extruir18_sk1:
        with BuildLine():
            Line((1.239203373, 50.999275258), (-1.239203373, 50.999275258))
            ThreePointArc((-1.239203373, 50.999275258), (-2.431884027, 49.478661068), (-2.2, 47.560071885))
            ThreePointArc((-2.2, 47.560071885), (-1.785444622, 47.013830635), (-1.239203373, 46.599275258))
            Line((-1.239203373, 46.599275258), (1.239203373, 46.599275258))
            ThreePointArc((1.239203373, 46.599275258), (2.525, 48.799275258), (1.239203373, 50.999275258))
        make_face()
    cortar_extruir18_tool1 = extrude(cortar_extruir18_sk1.sketch, amount=-CORTAR_EXTRUIR18_REACH, mode=Mode.PRIVATE) & part.part
    add(cortar_extruir18_tool1.solids().sort_by_distance((0, 48.799275, 3))[0], mode=Mode.SUBTRACT)

    # Croquis49 → Cortar-Extruir19 (cut)
    with BuildSketch(Plane.XY.offset(3)):
        with BuildLine():
            ThreePointArc((-11.618950039, -7), (-8.485281374, -1.514718626), (-3, 1.618950039))
            Line((-3, 1.618950039), (-6.154064033, 6.9153036))
            Line((-6.154064033, 6.9153036), (-22.907486476, 12.907486476))
            Line((-22.907486476, 12.907486476), (-16.537602787, -2.893123467))
            Line((-16.537602787, -2.893123467), (-11.618950039, -7))
        make_face()
        Polygon((0, 2), (-5, 10.396078054), (0, 22.396078054), (5, 10.396078054), align=None)
        with BuildLine():
            Line((7.106876533, 6.537602787), (3, 1.618950039))
            ThreePointArc((3, 1.618950039), (8.485281374, -1.514718626), (11.618950039, -7))
            Line((11.618950039, -7), (16.9153036, -3.845935967))
            Line((16.9153036, -3.845935967), (22.907486476, 12.907486476))
            Line((22.907486476, 12.907486476), (7.106876533, 6.537602787))
        make_face()
        Polygon((12, -10), (20.396078054, -15), (32.396078054, -10), (20.396078054, -5), align=None)
        with BuildLine():
            Line((16.537602787, -17.106876533), (11.618950039, -13))
            ThreePointArc((11.618950039, -13), (8.485281374, -18.485281374), (3, -21.618950039))
            Line((3, -21.618950039), (6.154064033, -26.9153036))
            Line((6.154064033, -26.9153036), (22.907486476, -32.907486476))
            Line((22.907486476, -32.907486476), (16.537602787, -17.106876533))
        make_face()
        with Locations((0, -10)):
            Circle(CROQUIS49_R)
        Polygon((0, -22), (-5, -30.396078054), (0, -42.396078054), (5, -30.396078054), align=None)
        with BuildLine():
            ThreePointArc((-3, -21.618950039), (-8.485281374, -18.485281374), (-11.618950039, -13))
            Line((-11.618950039, -13), (-16.9153036, -16.154064033))
            Line((-16.9153036, -16.154064033), (-22.907486476, -32.907486476))
            Line((-22.907486476, -32.907486476), (-7.106876533, -26.537602787))
            Line((-7.106876533, -26.537602787), (-3, -21.618950039))
        make_face()
        Polygon((-12, -10), (-20.396078054, -5), (-32.396078054, -10), (-20.396078054, -15), align=None)
    extrude(amount=-CORTAR_EXTRUIR19_DEPTH, mode=Mode.SUBTRACT)

    # Chaflán2
    chafl_n2_edges = [part.edges().sort_by_distance(p)[0] for p in [
        (48.732763252, -66.691616084, -5.134677716),
        (61.232763252, -72.386150889, -10.015484345),
        (73.732763252, -66.691616084, -5.134677716),
        (61.232763252, -60.997081279, -0.253871086),
    ]]
    chamfer(chafl_n2_edges, length=CHAFL_N2_SIZE)

    # Croquis51 → Saliente-Extruir22 (add)
    with BuildSketch(Plane(origin=(0, 0, 0), x_dir=(-1, 0, 0), z_dir=(0, 0, -1))):
        with BuildLine():
            Line((-1.683931412, 44.599275258), (1.683931412, 44.599275258))
            ThreePointArc((1.683931412, 44.599275258), (4.525, 48.799275258), (1.683931412, 52.999275258))
            Line((1.683931412, 52.999275258), (-1.683931412, 52.999275258))
            ThreePointArc((-1.683931412, 52.999275258), (-4.525, 48.799275258), (-1.683931412, 44.599275258))
        make_face()
        with BuildLine():
            Line((-1.239203373, 46.599275258), (1.239203373, 46.599275258))
            ThreePointArc((1.239203373, 46.599275258), (2.525, 48.799275258), (1.239203373, 50.999275258))
            Line((1.239203373, 50.999275258), (-1.239203373, 50.999275258))
            ThreePointArc((-1.239203373, 50.999275258), (-2.525, 48.799275258), (-1.239203373, 46.599275258))
        make_face(mode=Mode.SUBTRACT)
    extrude(amount=SALIENTE_EXTRUIR22_DEPTH)

    # Chaflán3
    chafl_n3_edges = [part.edges().sort_by_distance(p)[0] for p in [
        (89.5, 28.799275258, 3),
        (89.5, -12.890724742, 3),
        (-92.75, -12.890724742, 3),
        (-92.75, 28.799275258, 3),
    ]]
    chamfer(chafl_n3_edges, length=CHAFL_N3_SIZE)


solid = part.part
